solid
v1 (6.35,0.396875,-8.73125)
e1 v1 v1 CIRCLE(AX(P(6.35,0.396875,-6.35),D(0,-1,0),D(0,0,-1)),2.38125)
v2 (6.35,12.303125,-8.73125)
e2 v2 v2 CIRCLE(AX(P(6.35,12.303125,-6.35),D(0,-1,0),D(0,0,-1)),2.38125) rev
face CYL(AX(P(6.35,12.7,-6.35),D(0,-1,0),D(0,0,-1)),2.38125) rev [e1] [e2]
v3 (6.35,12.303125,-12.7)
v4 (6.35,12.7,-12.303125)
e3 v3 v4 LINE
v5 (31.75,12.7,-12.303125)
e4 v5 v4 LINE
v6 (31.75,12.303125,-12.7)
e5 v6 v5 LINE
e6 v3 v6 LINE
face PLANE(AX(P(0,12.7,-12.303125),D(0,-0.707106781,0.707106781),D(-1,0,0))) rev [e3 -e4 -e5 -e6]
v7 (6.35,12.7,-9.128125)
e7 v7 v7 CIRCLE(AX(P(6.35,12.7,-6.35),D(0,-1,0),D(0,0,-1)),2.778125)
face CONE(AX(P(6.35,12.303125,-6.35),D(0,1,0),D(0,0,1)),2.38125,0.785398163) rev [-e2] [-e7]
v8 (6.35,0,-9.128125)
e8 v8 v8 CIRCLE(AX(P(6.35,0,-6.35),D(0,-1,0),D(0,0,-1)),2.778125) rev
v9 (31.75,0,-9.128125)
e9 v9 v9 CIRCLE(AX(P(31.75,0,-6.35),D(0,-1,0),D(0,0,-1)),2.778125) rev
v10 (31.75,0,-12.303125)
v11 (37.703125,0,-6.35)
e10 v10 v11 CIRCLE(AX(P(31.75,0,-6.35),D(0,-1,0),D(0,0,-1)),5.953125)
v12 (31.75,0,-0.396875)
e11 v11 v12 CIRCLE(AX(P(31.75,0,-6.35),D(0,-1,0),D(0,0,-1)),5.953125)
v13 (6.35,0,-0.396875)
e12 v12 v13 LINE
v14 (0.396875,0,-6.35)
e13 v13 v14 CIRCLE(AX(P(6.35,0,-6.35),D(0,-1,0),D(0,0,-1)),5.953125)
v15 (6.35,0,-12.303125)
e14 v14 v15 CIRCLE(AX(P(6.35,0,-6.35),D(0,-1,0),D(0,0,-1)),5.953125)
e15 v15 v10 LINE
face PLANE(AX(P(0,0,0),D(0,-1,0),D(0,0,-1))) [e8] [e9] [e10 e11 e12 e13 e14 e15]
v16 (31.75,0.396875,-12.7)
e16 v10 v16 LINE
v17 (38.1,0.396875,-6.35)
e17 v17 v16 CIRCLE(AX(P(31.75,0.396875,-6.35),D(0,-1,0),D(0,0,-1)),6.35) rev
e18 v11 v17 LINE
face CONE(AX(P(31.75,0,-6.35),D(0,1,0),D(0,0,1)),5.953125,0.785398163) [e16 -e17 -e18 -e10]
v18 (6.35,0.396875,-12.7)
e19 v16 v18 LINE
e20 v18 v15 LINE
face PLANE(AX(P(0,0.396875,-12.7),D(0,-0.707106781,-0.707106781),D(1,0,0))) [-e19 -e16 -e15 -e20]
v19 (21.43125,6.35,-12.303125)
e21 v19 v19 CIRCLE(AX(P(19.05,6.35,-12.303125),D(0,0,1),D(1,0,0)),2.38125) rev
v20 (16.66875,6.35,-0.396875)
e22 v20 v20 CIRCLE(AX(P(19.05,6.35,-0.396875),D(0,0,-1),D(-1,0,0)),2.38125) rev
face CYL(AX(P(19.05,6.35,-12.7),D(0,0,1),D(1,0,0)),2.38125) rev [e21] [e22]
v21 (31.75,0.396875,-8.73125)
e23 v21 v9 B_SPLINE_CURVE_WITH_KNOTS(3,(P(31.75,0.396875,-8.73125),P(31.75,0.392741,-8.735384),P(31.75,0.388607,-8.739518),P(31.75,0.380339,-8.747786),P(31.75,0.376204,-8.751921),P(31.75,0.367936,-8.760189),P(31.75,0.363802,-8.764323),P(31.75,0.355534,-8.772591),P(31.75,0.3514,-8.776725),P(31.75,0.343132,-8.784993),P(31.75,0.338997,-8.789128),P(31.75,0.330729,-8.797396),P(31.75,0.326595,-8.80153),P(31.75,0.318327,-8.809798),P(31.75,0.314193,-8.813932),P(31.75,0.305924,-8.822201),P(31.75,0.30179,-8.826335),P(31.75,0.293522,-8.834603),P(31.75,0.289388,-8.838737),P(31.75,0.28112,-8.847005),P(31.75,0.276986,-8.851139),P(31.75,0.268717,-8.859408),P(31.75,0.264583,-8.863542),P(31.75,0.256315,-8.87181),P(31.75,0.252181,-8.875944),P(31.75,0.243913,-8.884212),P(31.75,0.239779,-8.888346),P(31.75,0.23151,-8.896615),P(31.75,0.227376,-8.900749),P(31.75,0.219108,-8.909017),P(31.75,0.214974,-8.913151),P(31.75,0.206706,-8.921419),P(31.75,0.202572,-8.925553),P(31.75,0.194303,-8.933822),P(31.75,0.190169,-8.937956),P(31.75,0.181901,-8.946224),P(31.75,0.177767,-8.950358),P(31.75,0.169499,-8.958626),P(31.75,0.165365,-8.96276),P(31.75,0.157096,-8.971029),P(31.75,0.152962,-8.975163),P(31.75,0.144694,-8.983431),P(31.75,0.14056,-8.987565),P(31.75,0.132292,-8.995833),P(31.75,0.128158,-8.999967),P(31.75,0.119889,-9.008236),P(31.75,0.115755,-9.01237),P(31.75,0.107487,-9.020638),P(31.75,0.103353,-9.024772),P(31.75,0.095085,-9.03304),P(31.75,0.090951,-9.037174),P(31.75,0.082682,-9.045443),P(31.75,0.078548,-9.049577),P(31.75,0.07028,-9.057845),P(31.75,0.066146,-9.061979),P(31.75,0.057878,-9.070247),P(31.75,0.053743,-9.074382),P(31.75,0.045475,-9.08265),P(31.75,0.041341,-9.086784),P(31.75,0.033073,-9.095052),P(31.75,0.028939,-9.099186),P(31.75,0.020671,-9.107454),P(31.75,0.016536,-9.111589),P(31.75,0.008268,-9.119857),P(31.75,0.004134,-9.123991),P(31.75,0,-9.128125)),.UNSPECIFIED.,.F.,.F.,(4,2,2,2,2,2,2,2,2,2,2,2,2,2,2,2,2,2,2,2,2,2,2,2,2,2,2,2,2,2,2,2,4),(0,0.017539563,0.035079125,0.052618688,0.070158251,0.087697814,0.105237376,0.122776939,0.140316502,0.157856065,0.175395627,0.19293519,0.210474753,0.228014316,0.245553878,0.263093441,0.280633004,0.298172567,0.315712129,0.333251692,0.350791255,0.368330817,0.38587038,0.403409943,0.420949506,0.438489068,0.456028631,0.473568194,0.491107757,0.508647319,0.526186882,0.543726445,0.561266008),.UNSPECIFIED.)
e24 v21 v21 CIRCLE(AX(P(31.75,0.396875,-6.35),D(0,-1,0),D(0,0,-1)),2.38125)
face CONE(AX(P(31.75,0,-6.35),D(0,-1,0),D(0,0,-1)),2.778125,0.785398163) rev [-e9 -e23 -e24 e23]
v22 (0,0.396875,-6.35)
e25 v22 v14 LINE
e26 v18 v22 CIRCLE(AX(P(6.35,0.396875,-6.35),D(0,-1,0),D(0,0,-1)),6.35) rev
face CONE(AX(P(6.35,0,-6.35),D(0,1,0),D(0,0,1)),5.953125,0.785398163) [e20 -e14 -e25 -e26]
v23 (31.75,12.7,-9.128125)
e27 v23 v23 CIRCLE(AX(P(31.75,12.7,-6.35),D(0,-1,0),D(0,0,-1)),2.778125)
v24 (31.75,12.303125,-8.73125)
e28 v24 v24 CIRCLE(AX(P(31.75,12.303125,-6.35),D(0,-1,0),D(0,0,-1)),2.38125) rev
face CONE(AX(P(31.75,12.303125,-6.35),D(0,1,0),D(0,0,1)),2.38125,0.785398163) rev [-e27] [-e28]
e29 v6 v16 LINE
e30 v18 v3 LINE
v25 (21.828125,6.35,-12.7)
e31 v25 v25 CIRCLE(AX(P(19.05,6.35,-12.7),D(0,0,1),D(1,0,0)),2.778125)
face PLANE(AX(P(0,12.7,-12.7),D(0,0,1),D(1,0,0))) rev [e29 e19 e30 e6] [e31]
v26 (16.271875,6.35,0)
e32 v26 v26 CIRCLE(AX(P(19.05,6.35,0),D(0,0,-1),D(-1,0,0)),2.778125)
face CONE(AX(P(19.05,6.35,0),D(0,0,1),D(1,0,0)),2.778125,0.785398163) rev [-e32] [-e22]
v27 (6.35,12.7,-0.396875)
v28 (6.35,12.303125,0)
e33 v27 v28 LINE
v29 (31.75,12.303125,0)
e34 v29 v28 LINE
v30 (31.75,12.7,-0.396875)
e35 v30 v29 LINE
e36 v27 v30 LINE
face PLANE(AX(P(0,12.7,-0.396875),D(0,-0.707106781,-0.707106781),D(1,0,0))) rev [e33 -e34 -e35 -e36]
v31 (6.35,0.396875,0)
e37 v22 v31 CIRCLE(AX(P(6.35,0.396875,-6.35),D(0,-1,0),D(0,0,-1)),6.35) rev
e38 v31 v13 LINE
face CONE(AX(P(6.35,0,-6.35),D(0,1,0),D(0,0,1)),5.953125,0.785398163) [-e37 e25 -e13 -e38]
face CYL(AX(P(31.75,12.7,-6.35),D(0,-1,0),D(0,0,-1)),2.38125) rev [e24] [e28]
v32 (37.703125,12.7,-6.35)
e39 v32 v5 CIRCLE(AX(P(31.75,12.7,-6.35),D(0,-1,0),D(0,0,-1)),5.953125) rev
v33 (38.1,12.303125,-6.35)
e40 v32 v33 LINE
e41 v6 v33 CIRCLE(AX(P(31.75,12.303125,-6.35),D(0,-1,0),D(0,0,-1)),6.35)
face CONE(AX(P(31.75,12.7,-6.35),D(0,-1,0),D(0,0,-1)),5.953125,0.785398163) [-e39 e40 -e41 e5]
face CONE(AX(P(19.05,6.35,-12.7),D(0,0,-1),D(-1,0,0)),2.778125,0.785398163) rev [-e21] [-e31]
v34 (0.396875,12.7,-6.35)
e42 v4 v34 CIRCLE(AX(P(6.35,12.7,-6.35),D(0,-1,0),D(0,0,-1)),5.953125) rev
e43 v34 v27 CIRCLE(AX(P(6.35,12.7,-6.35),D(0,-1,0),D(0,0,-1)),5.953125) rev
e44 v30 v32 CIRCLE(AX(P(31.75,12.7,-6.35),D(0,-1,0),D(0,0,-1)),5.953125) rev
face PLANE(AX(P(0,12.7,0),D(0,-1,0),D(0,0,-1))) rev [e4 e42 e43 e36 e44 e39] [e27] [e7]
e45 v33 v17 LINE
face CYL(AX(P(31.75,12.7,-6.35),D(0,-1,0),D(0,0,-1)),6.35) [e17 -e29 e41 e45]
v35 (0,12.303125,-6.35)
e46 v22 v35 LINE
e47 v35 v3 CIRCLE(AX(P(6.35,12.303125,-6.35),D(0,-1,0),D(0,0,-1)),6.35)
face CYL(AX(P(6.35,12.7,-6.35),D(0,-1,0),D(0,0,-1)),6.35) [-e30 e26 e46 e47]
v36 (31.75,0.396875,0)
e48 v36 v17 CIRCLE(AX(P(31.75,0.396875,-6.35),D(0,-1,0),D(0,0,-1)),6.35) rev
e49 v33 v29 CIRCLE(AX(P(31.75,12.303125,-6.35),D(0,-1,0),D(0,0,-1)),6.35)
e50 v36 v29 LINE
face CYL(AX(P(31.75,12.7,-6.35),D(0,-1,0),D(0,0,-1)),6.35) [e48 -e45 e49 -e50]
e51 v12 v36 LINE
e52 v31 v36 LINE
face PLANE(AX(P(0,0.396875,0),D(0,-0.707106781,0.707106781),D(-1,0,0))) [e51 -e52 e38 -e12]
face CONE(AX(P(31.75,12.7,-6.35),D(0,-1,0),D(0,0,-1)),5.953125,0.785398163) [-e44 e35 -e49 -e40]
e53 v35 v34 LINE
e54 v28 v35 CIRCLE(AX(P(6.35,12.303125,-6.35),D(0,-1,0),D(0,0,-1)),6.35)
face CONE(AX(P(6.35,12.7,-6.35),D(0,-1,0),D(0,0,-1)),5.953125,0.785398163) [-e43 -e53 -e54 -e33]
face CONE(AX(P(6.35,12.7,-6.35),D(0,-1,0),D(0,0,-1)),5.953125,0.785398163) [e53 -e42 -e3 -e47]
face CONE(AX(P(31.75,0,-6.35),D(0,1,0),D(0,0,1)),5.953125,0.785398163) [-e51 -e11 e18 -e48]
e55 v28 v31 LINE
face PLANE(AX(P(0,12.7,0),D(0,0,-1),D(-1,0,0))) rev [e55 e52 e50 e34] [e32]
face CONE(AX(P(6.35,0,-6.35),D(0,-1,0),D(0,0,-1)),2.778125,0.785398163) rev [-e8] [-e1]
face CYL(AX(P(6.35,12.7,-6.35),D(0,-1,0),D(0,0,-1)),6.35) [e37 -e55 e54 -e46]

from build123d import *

# Parameters (mm, degrees)
SKETCH1_W               = 38.1
SKETCH1_H               = 12.7
SKETCH1_R               = 2.38125
BOSS_EXTRUDE1_DEPTH     = 12.7
CUT_EXTRUDE1_DEPTH      = 43.121134838
CUT_EXTRUDE1_DEPTH_BACK = 43.121134838
SKETCH2_R               = 2.38125
FILLET2_R               = 6.35
CHAMFER3_SIZE           = 0.396875


with BuildPart() as part:
    # Sketch1 → Boss-Extrude1 (new body)
    with BuildSketch(Plane(origin=(0, 0, 0), x_dir=(1, 0, 0), z_dir=(0, 1, 0))):
        with Locations((19.05, 6.35)):
            Rectangle(SKETCH1_W, SKETCH1_H)
        with Locations(Location((6.35, 6.35, 0), (0, 0, 270))):
            Circle(SKETCH1_R, mode=Mode.SUBTRACT)
        with Locations(Location((31.75, 6.35, 0), (0, 0, 270))):
            Circle(SKETCH1_R, mode=Mode.SUBTRACT)
    extrude(amount=BOSS_EXTRUDE1_DEPTH)

    # Sketch2 → Cut-Extrude1 (cut, two sides: drawn at the far end of the back side and taken through both)
    with BuildSketch(Plane.XY.offset(-CUT_EXTRUDE1_DEPTH_BACK)):
        with Locations((19.05, 6.35)):
            Circle(SKETCH2_R)
    extrude(amount=CUT_EXTRUDE1_DEPTH + CUT_EXTRUDE1_DEPTH_BACK, mode=Mode.SUBTRACT)

    # Fillet2
    fillet2_edges = [part.edges().sort_by_distance(p)[0] for p in [
        (0, 6.35, -12.7),
        (0, 6.35, 0),
        (38.1, 6.35, -12.7),
        (38.1, 6.35, 0),
    ]]
    fillet(fillet2_edges, radius=FILLET2_R - 0.0001)  # a hair under: the kernel refuses the full size

    # Chamfer3
    chamfer3_edges = [part.edges().sort_by_distance(p)[0] for p in [
        (6.35, 0, -8.73125),
        (6.35, 12.7, -8.73125),
        (31.75, 0, -8.73125),
        (31.75, 12.7, -8.73125),
        (16.66875, 6.35, -12.7),
        (16.66875, 6.35, 0),
        (19.05, 0, -12.7),
        (19.05, 0, 0),
        (36.24015735, 0, -1.85984265),
        (36.24015735, 0, -10.84015735),
        (1.85984265, 0, -1.85984265),
        (1.85984265, 0, -10.84015735),
        (19.05, 12.7, -12.7),
        (19.05, 12.7, 0),
        (36.24015735, 12.7, -1.85984265),
        (36.24015735, 12.7, -10.84015735),
        (1.85984265, 12.7, -1.85984265),
        (1.85984265, 12.7, -10.84015735),
    ]]
    chamfer(chamfer3_edges, length=CHAMFER3_SIZE)


solid = part.part
